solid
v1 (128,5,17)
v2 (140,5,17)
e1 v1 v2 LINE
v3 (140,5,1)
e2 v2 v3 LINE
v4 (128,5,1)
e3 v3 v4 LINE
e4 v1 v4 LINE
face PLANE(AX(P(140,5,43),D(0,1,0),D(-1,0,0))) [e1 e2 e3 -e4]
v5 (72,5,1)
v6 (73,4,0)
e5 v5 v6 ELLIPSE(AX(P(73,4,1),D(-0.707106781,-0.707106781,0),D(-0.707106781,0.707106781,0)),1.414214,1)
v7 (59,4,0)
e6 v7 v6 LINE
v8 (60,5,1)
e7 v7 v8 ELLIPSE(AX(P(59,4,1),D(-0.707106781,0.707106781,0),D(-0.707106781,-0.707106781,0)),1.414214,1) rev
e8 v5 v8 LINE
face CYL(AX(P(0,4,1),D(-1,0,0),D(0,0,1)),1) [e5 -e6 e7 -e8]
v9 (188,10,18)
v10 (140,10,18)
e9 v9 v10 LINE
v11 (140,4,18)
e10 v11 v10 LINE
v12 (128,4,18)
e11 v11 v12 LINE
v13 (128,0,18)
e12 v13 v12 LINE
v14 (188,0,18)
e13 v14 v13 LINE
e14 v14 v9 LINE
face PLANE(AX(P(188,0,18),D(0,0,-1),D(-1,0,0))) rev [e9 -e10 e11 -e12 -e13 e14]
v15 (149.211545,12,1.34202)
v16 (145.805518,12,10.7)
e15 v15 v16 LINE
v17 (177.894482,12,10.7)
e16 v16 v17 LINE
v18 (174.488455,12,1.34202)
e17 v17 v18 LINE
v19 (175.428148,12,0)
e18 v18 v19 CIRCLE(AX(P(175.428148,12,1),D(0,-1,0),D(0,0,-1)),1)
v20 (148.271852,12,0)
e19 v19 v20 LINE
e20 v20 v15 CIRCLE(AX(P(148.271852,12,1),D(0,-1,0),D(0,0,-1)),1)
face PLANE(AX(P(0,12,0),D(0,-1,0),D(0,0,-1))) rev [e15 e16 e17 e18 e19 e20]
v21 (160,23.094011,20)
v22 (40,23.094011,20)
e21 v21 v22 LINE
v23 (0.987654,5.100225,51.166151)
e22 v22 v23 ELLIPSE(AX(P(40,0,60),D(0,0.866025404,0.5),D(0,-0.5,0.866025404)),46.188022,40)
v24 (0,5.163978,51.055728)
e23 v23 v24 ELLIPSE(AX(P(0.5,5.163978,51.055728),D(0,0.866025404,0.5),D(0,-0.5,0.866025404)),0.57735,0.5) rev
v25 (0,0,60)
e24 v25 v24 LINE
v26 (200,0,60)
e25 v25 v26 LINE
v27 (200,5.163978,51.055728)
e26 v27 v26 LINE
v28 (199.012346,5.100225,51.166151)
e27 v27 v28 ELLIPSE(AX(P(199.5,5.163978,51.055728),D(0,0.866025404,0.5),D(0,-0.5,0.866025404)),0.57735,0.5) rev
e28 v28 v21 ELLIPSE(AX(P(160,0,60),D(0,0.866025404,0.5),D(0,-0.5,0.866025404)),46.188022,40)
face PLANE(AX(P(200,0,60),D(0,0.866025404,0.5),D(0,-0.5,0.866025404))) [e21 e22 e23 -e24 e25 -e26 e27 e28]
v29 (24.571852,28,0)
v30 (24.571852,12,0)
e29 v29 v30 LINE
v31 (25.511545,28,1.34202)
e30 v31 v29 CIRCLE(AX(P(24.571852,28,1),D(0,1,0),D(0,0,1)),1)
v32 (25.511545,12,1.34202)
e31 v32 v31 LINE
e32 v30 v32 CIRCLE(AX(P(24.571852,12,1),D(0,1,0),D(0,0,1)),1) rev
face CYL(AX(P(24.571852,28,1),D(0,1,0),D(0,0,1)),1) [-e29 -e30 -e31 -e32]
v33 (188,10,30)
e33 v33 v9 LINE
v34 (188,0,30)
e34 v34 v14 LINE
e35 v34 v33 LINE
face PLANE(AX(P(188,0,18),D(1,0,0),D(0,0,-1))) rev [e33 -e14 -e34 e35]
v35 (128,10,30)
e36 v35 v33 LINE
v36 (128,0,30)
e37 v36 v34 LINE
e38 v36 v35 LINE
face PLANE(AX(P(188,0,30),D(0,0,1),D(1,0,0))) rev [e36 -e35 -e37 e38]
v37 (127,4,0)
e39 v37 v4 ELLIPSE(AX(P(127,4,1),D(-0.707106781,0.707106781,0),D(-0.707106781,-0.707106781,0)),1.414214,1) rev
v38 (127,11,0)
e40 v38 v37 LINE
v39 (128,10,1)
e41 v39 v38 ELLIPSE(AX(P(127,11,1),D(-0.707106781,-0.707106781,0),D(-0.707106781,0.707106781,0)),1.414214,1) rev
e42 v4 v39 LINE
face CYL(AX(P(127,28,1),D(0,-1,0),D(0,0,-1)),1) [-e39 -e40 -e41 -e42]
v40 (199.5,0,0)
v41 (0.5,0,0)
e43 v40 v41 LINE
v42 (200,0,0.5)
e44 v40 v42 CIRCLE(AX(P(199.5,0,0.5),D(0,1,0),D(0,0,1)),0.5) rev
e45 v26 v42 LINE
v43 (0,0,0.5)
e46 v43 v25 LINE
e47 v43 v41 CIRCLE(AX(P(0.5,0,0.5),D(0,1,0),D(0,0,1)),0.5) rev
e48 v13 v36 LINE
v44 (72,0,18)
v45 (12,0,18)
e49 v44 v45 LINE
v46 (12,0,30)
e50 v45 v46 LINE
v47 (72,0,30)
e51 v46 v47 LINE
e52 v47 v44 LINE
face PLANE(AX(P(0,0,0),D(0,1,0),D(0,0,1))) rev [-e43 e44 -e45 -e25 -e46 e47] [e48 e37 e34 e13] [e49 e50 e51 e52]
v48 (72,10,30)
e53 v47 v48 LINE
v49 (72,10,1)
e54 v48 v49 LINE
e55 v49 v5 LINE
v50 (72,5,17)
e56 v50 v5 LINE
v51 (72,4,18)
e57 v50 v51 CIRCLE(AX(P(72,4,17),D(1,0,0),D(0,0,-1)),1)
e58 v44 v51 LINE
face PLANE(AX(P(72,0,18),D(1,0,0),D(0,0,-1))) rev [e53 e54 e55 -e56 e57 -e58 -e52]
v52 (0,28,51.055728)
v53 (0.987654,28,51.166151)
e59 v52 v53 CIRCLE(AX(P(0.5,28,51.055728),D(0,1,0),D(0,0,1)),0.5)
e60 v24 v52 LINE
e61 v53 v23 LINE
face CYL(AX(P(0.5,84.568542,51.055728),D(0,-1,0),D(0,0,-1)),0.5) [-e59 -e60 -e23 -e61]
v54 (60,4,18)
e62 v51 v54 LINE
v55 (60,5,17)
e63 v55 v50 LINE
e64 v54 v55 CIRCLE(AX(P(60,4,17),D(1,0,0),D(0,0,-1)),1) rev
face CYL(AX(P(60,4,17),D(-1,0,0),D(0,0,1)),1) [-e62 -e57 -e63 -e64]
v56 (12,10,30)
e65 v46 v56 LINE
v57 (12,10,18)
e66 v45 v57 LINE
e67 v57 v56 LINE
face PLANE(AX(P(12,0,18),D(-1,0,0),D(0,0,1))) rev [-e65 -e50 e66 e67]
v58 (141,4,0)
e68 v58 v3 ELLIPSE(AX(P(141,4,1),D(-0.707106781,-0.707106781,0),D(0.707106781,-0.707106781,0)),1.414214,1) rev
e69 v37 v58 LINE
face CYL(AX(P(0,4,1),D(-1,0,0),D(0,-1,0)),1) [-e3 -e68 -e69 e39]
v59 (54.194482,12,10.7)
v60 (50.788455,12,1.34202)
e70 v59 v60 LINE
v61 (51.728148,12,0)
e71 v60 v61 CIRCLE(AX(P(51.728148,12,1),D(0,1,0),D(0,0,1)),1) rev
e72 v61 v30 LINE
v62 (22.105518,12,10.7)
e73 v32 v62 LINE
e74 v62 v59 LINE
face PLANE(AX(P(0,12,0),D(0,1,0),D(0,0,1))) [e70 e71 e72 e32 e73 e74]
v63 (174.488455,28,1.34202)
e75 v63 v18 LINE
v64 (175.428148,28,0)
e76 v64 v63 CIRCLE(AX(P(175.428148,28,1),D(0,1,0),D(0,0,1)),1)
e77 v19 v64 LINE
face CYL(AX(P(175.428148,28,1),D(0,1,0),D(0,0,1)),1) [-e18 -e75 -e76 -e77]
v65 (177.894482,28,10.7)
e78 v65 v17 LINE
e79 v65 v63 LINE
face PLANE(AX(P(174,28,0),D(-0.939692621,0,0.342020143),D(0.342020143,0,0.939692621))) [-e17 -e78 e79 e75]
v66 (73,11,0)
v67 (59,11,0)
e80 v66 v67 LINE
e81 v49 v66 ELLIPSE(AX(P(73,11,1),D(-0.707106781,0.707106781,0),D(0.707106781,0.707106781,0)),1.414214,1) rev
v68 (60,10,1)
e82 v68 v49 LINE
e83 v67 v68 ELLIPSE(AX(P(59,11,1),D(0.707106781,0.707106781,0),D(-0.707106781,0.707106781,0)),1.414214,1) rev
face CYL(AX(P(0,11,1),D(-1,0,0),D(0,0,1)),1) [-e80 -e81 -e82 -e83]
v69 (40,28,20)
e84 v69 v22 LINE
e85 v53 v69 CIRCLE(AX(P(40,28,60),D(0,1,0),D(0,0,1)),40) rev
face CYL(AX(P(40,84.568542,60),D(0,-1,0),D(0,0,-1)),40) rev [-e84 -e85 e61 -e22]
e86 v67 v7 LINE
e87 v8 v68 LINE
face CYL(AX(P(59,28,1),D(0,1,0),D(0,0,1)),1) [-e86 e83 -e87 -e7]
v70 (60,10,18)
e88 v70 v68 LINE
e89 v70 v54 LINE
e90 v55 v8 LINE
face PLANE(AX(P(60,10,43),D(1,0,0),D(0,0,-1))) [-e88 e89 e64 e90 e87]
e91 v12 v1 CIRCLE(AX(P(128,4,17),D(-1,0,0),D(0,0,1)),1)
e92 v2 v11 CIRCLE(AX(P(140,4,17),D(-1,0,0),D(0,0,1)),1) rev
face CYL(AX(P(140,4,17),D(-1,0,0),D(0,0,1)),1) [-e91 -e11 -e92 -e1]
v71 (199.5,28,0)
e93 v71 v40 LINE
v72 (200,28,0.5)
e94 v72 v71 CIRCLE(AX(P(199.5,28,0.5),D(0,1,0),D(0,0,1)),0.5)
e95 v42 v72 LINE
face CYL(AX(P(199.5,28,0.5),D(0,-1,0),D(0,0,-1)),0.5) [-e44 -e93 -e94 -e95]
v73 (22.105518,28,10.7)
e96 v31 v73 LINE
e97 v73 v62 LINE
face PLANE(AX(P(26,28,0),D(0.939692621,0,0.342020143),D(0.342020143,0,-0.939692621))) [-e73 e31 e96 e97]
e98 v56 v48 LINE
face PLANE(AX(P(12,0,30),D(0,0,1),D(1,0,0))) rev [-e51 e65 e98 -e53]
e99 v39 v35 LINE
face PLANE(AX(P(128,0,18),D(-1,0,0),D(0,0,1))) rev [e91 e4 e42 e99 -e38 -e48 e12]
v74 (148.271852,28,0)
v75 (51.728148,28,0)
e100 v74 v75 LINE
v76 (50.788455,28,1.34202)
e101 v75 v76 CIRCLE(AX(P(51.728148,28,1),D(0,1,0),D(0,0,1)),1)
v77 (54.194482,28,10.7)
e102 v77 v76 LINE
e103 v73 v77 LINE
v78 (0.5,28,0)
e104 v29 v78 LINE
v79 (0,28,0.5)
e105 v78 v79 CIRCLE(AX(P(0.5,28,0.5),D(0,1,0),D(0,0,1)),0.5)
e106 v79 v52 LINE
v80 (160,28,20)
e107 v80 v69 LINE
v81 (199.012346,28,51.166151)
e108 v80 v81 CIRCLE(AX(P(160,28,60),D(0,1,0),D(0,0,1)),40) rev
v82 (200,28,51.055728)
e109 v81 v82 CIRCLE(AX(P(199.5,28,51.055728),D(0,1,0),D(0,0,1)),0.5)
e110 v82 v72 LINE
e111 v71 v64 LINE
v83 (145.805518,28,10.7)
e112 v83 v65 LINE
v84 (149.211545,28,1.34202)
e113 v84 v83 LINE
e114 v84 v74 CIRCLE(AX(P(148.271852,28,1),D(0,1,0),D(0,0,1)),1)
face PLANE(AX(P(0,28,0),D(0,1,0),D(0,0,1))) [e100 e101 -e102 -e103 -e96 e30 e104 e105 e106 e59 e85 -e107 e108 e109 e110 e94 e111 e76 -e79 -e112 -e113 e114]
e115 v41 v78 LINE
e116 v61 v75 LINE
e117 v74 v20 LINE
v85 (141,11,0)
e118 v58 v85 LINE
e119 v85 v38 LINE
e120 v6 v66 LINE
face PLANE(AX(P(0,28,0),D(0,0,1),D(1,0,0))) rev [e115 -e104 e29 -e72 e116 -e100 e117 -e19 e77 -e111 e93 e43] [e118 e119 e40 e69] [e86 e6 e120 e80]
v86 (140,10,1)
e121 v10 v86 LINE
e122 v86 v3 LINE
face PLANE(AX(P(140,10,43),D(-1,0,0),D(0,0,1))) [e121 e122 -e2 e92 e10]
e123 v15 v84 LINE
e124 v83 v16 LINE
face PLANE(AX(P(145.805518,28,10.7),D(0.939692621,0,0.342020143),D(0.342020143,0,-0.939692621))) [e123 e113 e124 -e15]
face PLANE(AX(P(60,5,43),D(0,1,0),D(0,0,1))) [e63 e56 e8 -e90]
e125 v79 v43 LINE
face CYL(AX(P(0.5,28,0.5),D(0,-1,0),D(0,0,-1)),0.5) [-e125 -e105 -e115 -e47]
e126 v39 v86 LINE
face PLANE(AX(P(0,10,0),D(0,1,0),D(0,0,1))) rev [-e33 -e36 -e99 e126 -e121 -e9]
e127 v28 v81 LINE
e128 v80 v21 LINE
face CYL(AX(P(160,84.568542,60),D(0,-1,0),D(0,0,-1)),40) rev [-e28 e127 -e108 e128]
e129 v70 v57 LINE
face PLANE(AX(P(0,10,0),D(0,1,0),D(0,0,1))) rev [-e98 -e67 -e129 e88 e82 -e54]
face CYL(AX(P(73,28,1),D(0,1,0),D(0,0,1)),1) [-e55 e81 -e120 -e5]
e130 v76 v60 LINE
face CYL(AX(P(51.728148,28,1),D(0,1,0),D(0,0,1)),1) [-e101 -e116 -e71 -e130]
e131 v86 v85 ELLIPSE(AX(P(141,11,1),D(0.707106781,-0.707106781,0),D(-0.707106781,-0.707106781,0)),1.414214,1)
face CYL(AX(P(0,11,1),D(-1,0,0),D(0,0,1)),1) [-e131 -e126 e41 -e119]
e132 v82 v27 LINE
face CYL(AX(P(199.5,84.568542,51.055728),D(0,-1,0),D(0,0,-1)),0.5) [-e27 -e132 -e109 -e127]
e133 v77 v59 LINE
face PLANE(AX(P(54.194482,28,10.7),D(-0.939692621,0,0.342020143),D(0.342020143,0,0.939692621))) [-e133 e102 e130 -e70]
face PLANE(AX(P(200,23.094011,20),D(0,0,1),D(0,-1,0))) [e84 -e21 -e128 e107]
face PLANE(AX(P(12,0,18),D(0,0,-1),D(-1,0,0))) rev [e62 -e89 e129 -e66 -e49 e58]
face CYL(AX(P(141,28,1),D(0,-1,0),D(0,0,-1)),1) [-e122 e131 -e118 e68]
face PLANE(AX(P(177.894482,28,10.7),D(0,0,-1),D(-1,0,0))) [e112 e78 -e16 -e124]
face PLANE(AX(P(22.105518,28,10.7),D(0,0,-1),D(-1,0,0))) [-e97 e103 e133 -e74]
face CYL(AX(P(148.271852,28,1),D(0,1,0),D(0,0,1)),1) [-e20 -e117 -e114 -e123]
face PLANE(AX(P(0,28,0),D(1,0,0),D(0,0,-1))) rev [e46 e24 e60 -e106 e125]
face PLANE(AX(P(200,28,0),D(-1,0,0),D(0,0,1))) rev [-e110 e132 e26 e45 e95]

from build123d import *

# Parameters (mm, degrees)
SKETCH_1_W          = 200
SKETCH_1_H          = 60
EXTRUDE_1_DEPTH     = 28
CUT_EXTRUDE_1_DEPTH = 211.675105316
EXTRUDE_2_REACH     = 212.675
FILLET_1_R          = 0.5
CUT_EXTRUDE_START   = 12
CUT_EXTRUDE_2_DEPTH = 199.675105316
CUT_EXTRUDE_START_2 = 10
SKETCH_5_W          = 60
SKETCH_5_H          = 12
CUT_EXTRUDE_3_DEPTH = 221.675105316
SKETCH_6_W          = 12
SKETCH_6_H          = 5
CUT_EXTRUDE_4_DEPTH = 30
FILLET_2_R          = 1


with BuildPart() as part:
    # 草图1 → 凸台-拉伸1 (new body)
    with BuildSketch(Plane(origin=(0, 0, 0), x_dir=(1, 0, 0), z_dir=(0, 1, 0))):
        with Locations((100, -30)):
            Rectangle(SKETCH_1_W, SKETCH_1_H)
    extrude(amount=EXTRUDE_1_DEPTH)

    # 草图2 → 切除-拉伸1 (cut, through all)
    with BuildSketch(Plane(origin=(0, 0, 0), x_dir=(0, 0, -1), z_dir=(1, 0, 0))):
        Polygon((-60, 0), (-20, 23.094010768), (-20, 28), (-60, 28), align=None)
    extrude(amount=CUT_EXTRUDE_1_DEPTH, mode=Mode.SUBTRACT)

    # 凸台-拉伸2: up to this face of the body (flat: up to its plane)
    extrude_2_end = Plane(part.part.faces().sort_by_distance((100, 28, 10))[0])
    # 草图3 → 凸台-拉伸2 (add, up to the picked face)
    with BuildSketch(Plane(origin=(0, 0, 0), x_dir=(1, 0, 0), z_dir=(0, 1, 0)), mode=Mode.PRIVATE) as extrude_2_sk1:
        with BuildLine():
            Line((0, -60), (0, -20))
            Line((0, -20), (40, -20))
            ThreePointArc((40, -20), (11.715728753, -31.715728753), (0, -60))
        make_face()
    extrude_2_tool1 = split(extrude(extrude_2_sk1.sketch, amount=EXTRUDE_2_REACH, mode=Mode.PRIVATE), bisect_by=extrude_2_end, keep=Keep.BOTH, mode=Mode.PRIVATE)
    # 草图3 → 凸台-拉伸2 (add, up to the picked face)
    with BuildSketch(Plane(origin=(0, 0, 0), x_dir=(1, 0, 0), z_dir=(0, 1, 0)), mode=Mode.PRIVATE) as extrude_2_sk2:
        with BuildLine():
            Line((200, -20), (160, -20))
            ThreePointArc((160, -20), (188.284271247, -31.715728753), (200, -60))
            Line((200, -60), (200, -20))
        make_face()
    extrude_2_tool2 = split(extrude(extrude_2_sk2.sketch, amount=EXTRUDE_2_REACH, mode=Mode.PRIVATE), bisect_by=extrude_2_end, keep=Keep.BOTH, mode=Mode.PRIVATE)
    add(extrude_2_tool1.solids().sort_by(Axis((8.934718, 0, 28.934718), (0, 1, 0)))[0])
    add(extrude_2_tool2.solids().sort_by(Axis((191.065282, 0, 28.934718), (0, 1, 0)))[0])

    # 圆角1
    # the kernel refuses this fillet: 0.5 mm, written as the material it takes off along each edge
    with BuildSketch(Plane(origin=(200, -22.360679775, 60), x_dir=(-0.11111111111111022, 0, -0.9938079899999066), z_dir=(0, 1, 0))) as fillet_1_piece_1_section:
        with BuildLine():
            CenterArc((8.944444444, -0.496903995), FILLET_1_R, 96.379370208, 167.241259583)
            Line((8.888888889, -0.99380799), (0, 0))
            ThreePointArc((0, 0), (4.444444444, -0.2476804), (8.888888889, 0))
        make_face()
    fillet_1_piece_1 = extrude(amount=72.72135955, mode=Mode.PRIVATE)
    fillet_1_piece_1 = split(fillet_1_piece_1, bisect_by=Plane(origin=(199.731100006, 6.705360676, 48.385974626), z_dir=(0, 0.8660254037844379, 0.5000000000000012)), keep=Keep.TOP, mode=Mode.PRIVATE)
    add(fillet_1_piece_1, mode=Mode.SUBTRACT)
    with BuildSketch(Plane(origin=(0, -22.360679775, 60), x_dir=(0.11111111111111158, 0, -0.9938079899999065), z_dir=(0, 1, 0))) as fillet_1_piece_2_section:
        with BuildLine():
            CenterArc((8.944444444, 0.496903995), FILLET_1_R, 96.379370208, 167.241259583)
            Line((8.888888889, 0.99380799), (0, 0))
            ThreePointArc((0, 0), (4.444444444, 0.2476804), (8.888888889, 0))
        make_face()
    fillet_1_piece_2 = extrude(amount=72.72135955, mode=Mode.PRIVATE)
    fillet_1_piece_2 = split(fillet_1_piece_2, bisect_by=Plane(origin=(0.268899994, 6.705360676, 48.385974626), z_dir=(0, 0.8660254037844379, 0.5000000000000012)), keep=Keep.TOP, mode=Mode.PRIVATE)
    add(fillet_1_piece_2, mode=Mode.SUBTRACT)
    with BuildSketch(Plane(origin=(0, -1.25, 0), x_dir=(1, 0, 0), z_dir=(0, 1, 0))) as fillet_1_piece_3:
        with BuildLine():
            CenterArc((FILLET_1_R, -FILLET_1_R), FILLET_1_R, 90, 90)
            Line((0, -FILLET_1_R), (0, 0))
            Line((0, 0), (FILLET_1_R, 0))
        make_face()
    extrude(amount=30.5, mode=Mode.SUBTRACT)
    with BuildSketch(Plane(origin=(200, -1.25, 0), x_dir=(-1, 0, 0), z_dir=(0, 1, 0))) as fillet_1_piece_4:
        with BuildLine():
            CenterArc((FILLET_1_R, FILLET_1_R), FILLET_1_R, 180, 90)
            Line((0, FILLET_1_R), (0, 0))
            Line((0, 0), (FILLET_1_R, 0))
        make_face()
    extrude(amount=30.5, mode=Mode.SUBTRACT)

    # 草图4 → 切除-拉伸2 (cut, through all)
    with BuildSketch(Plane(origin=(0, 0, 0), x_dir=(1, 0, 0), z_dir=(0, 1, 0)).offset(CUT_EXTRUDE_START)):
        Polygon((26, 0), (22.105518493, -10.7), (54.194481507, -10.7), (50.3, 0), align=None)
        Polygon((145.805518493, -10.7), (149.7, 0), (174, 0), (177.894481507, -10.7), align=None)
    extrude(amount=CUT_EXTRUDE_2_DEPTH, mode=Mode.SUBTRACT)

    # 草图5 → 切除-拉伸3 (cut, through all)
    with BuildSketch(Plane(origin=(0, 0, 0), x_dir=(1, 0, 0), z_dir=(0, 1, 0)).offset(CUT_EXTRUDE_START_2)):
        with Locations((42, -24)):
            Rectangle(SKETCH_5_W, SKETCH_5_H)
        with Locations((158, -24)):
            Rectangle(SKETCH_5_W, SKETCH_5_H)
    extrude(amount=-CUT_EXTRUDE_3_DEPTH, mode=Mode.SUBTRACT)

    # 草图6 → 切除-拉伸4 (cut)
    with BuildSketch(Plane.XY):
        with Locations((66, 7.5)):
            Rectangle(SKETCH_6_W, SKETCH_6_H)
        with Locations((134, 7.5)):
            Rectangle(SKETCH_6_W, SKETCH_6_H)
    extrude(amount=CUT_EXTRUDE_4_DEPTH, mode=Mode.SUBTRACT)

    # 圆角2
    fillet_2_edges = [part.edges().sort_by_distance(p)[0] for p in [
        (50.3, 20, 0),
        (26, 20, 0),
        (174, 20, 0),
        (149.7, 20, 0),
        (66, 5, 0),
        (66, 10, 0),
        (60, 7.5, 0),
        (72, 7.5, 0),
        (66, 5, 18),
        (134, 10, 0),
        (134, 5, 0),
        (128, 7.5, 0),
        (140, 7.5, 0),
        (134, 5, 18),
    ]]
    fillet(fillet_2_edges, radius=FILLET_2_R)


solid = part.part
